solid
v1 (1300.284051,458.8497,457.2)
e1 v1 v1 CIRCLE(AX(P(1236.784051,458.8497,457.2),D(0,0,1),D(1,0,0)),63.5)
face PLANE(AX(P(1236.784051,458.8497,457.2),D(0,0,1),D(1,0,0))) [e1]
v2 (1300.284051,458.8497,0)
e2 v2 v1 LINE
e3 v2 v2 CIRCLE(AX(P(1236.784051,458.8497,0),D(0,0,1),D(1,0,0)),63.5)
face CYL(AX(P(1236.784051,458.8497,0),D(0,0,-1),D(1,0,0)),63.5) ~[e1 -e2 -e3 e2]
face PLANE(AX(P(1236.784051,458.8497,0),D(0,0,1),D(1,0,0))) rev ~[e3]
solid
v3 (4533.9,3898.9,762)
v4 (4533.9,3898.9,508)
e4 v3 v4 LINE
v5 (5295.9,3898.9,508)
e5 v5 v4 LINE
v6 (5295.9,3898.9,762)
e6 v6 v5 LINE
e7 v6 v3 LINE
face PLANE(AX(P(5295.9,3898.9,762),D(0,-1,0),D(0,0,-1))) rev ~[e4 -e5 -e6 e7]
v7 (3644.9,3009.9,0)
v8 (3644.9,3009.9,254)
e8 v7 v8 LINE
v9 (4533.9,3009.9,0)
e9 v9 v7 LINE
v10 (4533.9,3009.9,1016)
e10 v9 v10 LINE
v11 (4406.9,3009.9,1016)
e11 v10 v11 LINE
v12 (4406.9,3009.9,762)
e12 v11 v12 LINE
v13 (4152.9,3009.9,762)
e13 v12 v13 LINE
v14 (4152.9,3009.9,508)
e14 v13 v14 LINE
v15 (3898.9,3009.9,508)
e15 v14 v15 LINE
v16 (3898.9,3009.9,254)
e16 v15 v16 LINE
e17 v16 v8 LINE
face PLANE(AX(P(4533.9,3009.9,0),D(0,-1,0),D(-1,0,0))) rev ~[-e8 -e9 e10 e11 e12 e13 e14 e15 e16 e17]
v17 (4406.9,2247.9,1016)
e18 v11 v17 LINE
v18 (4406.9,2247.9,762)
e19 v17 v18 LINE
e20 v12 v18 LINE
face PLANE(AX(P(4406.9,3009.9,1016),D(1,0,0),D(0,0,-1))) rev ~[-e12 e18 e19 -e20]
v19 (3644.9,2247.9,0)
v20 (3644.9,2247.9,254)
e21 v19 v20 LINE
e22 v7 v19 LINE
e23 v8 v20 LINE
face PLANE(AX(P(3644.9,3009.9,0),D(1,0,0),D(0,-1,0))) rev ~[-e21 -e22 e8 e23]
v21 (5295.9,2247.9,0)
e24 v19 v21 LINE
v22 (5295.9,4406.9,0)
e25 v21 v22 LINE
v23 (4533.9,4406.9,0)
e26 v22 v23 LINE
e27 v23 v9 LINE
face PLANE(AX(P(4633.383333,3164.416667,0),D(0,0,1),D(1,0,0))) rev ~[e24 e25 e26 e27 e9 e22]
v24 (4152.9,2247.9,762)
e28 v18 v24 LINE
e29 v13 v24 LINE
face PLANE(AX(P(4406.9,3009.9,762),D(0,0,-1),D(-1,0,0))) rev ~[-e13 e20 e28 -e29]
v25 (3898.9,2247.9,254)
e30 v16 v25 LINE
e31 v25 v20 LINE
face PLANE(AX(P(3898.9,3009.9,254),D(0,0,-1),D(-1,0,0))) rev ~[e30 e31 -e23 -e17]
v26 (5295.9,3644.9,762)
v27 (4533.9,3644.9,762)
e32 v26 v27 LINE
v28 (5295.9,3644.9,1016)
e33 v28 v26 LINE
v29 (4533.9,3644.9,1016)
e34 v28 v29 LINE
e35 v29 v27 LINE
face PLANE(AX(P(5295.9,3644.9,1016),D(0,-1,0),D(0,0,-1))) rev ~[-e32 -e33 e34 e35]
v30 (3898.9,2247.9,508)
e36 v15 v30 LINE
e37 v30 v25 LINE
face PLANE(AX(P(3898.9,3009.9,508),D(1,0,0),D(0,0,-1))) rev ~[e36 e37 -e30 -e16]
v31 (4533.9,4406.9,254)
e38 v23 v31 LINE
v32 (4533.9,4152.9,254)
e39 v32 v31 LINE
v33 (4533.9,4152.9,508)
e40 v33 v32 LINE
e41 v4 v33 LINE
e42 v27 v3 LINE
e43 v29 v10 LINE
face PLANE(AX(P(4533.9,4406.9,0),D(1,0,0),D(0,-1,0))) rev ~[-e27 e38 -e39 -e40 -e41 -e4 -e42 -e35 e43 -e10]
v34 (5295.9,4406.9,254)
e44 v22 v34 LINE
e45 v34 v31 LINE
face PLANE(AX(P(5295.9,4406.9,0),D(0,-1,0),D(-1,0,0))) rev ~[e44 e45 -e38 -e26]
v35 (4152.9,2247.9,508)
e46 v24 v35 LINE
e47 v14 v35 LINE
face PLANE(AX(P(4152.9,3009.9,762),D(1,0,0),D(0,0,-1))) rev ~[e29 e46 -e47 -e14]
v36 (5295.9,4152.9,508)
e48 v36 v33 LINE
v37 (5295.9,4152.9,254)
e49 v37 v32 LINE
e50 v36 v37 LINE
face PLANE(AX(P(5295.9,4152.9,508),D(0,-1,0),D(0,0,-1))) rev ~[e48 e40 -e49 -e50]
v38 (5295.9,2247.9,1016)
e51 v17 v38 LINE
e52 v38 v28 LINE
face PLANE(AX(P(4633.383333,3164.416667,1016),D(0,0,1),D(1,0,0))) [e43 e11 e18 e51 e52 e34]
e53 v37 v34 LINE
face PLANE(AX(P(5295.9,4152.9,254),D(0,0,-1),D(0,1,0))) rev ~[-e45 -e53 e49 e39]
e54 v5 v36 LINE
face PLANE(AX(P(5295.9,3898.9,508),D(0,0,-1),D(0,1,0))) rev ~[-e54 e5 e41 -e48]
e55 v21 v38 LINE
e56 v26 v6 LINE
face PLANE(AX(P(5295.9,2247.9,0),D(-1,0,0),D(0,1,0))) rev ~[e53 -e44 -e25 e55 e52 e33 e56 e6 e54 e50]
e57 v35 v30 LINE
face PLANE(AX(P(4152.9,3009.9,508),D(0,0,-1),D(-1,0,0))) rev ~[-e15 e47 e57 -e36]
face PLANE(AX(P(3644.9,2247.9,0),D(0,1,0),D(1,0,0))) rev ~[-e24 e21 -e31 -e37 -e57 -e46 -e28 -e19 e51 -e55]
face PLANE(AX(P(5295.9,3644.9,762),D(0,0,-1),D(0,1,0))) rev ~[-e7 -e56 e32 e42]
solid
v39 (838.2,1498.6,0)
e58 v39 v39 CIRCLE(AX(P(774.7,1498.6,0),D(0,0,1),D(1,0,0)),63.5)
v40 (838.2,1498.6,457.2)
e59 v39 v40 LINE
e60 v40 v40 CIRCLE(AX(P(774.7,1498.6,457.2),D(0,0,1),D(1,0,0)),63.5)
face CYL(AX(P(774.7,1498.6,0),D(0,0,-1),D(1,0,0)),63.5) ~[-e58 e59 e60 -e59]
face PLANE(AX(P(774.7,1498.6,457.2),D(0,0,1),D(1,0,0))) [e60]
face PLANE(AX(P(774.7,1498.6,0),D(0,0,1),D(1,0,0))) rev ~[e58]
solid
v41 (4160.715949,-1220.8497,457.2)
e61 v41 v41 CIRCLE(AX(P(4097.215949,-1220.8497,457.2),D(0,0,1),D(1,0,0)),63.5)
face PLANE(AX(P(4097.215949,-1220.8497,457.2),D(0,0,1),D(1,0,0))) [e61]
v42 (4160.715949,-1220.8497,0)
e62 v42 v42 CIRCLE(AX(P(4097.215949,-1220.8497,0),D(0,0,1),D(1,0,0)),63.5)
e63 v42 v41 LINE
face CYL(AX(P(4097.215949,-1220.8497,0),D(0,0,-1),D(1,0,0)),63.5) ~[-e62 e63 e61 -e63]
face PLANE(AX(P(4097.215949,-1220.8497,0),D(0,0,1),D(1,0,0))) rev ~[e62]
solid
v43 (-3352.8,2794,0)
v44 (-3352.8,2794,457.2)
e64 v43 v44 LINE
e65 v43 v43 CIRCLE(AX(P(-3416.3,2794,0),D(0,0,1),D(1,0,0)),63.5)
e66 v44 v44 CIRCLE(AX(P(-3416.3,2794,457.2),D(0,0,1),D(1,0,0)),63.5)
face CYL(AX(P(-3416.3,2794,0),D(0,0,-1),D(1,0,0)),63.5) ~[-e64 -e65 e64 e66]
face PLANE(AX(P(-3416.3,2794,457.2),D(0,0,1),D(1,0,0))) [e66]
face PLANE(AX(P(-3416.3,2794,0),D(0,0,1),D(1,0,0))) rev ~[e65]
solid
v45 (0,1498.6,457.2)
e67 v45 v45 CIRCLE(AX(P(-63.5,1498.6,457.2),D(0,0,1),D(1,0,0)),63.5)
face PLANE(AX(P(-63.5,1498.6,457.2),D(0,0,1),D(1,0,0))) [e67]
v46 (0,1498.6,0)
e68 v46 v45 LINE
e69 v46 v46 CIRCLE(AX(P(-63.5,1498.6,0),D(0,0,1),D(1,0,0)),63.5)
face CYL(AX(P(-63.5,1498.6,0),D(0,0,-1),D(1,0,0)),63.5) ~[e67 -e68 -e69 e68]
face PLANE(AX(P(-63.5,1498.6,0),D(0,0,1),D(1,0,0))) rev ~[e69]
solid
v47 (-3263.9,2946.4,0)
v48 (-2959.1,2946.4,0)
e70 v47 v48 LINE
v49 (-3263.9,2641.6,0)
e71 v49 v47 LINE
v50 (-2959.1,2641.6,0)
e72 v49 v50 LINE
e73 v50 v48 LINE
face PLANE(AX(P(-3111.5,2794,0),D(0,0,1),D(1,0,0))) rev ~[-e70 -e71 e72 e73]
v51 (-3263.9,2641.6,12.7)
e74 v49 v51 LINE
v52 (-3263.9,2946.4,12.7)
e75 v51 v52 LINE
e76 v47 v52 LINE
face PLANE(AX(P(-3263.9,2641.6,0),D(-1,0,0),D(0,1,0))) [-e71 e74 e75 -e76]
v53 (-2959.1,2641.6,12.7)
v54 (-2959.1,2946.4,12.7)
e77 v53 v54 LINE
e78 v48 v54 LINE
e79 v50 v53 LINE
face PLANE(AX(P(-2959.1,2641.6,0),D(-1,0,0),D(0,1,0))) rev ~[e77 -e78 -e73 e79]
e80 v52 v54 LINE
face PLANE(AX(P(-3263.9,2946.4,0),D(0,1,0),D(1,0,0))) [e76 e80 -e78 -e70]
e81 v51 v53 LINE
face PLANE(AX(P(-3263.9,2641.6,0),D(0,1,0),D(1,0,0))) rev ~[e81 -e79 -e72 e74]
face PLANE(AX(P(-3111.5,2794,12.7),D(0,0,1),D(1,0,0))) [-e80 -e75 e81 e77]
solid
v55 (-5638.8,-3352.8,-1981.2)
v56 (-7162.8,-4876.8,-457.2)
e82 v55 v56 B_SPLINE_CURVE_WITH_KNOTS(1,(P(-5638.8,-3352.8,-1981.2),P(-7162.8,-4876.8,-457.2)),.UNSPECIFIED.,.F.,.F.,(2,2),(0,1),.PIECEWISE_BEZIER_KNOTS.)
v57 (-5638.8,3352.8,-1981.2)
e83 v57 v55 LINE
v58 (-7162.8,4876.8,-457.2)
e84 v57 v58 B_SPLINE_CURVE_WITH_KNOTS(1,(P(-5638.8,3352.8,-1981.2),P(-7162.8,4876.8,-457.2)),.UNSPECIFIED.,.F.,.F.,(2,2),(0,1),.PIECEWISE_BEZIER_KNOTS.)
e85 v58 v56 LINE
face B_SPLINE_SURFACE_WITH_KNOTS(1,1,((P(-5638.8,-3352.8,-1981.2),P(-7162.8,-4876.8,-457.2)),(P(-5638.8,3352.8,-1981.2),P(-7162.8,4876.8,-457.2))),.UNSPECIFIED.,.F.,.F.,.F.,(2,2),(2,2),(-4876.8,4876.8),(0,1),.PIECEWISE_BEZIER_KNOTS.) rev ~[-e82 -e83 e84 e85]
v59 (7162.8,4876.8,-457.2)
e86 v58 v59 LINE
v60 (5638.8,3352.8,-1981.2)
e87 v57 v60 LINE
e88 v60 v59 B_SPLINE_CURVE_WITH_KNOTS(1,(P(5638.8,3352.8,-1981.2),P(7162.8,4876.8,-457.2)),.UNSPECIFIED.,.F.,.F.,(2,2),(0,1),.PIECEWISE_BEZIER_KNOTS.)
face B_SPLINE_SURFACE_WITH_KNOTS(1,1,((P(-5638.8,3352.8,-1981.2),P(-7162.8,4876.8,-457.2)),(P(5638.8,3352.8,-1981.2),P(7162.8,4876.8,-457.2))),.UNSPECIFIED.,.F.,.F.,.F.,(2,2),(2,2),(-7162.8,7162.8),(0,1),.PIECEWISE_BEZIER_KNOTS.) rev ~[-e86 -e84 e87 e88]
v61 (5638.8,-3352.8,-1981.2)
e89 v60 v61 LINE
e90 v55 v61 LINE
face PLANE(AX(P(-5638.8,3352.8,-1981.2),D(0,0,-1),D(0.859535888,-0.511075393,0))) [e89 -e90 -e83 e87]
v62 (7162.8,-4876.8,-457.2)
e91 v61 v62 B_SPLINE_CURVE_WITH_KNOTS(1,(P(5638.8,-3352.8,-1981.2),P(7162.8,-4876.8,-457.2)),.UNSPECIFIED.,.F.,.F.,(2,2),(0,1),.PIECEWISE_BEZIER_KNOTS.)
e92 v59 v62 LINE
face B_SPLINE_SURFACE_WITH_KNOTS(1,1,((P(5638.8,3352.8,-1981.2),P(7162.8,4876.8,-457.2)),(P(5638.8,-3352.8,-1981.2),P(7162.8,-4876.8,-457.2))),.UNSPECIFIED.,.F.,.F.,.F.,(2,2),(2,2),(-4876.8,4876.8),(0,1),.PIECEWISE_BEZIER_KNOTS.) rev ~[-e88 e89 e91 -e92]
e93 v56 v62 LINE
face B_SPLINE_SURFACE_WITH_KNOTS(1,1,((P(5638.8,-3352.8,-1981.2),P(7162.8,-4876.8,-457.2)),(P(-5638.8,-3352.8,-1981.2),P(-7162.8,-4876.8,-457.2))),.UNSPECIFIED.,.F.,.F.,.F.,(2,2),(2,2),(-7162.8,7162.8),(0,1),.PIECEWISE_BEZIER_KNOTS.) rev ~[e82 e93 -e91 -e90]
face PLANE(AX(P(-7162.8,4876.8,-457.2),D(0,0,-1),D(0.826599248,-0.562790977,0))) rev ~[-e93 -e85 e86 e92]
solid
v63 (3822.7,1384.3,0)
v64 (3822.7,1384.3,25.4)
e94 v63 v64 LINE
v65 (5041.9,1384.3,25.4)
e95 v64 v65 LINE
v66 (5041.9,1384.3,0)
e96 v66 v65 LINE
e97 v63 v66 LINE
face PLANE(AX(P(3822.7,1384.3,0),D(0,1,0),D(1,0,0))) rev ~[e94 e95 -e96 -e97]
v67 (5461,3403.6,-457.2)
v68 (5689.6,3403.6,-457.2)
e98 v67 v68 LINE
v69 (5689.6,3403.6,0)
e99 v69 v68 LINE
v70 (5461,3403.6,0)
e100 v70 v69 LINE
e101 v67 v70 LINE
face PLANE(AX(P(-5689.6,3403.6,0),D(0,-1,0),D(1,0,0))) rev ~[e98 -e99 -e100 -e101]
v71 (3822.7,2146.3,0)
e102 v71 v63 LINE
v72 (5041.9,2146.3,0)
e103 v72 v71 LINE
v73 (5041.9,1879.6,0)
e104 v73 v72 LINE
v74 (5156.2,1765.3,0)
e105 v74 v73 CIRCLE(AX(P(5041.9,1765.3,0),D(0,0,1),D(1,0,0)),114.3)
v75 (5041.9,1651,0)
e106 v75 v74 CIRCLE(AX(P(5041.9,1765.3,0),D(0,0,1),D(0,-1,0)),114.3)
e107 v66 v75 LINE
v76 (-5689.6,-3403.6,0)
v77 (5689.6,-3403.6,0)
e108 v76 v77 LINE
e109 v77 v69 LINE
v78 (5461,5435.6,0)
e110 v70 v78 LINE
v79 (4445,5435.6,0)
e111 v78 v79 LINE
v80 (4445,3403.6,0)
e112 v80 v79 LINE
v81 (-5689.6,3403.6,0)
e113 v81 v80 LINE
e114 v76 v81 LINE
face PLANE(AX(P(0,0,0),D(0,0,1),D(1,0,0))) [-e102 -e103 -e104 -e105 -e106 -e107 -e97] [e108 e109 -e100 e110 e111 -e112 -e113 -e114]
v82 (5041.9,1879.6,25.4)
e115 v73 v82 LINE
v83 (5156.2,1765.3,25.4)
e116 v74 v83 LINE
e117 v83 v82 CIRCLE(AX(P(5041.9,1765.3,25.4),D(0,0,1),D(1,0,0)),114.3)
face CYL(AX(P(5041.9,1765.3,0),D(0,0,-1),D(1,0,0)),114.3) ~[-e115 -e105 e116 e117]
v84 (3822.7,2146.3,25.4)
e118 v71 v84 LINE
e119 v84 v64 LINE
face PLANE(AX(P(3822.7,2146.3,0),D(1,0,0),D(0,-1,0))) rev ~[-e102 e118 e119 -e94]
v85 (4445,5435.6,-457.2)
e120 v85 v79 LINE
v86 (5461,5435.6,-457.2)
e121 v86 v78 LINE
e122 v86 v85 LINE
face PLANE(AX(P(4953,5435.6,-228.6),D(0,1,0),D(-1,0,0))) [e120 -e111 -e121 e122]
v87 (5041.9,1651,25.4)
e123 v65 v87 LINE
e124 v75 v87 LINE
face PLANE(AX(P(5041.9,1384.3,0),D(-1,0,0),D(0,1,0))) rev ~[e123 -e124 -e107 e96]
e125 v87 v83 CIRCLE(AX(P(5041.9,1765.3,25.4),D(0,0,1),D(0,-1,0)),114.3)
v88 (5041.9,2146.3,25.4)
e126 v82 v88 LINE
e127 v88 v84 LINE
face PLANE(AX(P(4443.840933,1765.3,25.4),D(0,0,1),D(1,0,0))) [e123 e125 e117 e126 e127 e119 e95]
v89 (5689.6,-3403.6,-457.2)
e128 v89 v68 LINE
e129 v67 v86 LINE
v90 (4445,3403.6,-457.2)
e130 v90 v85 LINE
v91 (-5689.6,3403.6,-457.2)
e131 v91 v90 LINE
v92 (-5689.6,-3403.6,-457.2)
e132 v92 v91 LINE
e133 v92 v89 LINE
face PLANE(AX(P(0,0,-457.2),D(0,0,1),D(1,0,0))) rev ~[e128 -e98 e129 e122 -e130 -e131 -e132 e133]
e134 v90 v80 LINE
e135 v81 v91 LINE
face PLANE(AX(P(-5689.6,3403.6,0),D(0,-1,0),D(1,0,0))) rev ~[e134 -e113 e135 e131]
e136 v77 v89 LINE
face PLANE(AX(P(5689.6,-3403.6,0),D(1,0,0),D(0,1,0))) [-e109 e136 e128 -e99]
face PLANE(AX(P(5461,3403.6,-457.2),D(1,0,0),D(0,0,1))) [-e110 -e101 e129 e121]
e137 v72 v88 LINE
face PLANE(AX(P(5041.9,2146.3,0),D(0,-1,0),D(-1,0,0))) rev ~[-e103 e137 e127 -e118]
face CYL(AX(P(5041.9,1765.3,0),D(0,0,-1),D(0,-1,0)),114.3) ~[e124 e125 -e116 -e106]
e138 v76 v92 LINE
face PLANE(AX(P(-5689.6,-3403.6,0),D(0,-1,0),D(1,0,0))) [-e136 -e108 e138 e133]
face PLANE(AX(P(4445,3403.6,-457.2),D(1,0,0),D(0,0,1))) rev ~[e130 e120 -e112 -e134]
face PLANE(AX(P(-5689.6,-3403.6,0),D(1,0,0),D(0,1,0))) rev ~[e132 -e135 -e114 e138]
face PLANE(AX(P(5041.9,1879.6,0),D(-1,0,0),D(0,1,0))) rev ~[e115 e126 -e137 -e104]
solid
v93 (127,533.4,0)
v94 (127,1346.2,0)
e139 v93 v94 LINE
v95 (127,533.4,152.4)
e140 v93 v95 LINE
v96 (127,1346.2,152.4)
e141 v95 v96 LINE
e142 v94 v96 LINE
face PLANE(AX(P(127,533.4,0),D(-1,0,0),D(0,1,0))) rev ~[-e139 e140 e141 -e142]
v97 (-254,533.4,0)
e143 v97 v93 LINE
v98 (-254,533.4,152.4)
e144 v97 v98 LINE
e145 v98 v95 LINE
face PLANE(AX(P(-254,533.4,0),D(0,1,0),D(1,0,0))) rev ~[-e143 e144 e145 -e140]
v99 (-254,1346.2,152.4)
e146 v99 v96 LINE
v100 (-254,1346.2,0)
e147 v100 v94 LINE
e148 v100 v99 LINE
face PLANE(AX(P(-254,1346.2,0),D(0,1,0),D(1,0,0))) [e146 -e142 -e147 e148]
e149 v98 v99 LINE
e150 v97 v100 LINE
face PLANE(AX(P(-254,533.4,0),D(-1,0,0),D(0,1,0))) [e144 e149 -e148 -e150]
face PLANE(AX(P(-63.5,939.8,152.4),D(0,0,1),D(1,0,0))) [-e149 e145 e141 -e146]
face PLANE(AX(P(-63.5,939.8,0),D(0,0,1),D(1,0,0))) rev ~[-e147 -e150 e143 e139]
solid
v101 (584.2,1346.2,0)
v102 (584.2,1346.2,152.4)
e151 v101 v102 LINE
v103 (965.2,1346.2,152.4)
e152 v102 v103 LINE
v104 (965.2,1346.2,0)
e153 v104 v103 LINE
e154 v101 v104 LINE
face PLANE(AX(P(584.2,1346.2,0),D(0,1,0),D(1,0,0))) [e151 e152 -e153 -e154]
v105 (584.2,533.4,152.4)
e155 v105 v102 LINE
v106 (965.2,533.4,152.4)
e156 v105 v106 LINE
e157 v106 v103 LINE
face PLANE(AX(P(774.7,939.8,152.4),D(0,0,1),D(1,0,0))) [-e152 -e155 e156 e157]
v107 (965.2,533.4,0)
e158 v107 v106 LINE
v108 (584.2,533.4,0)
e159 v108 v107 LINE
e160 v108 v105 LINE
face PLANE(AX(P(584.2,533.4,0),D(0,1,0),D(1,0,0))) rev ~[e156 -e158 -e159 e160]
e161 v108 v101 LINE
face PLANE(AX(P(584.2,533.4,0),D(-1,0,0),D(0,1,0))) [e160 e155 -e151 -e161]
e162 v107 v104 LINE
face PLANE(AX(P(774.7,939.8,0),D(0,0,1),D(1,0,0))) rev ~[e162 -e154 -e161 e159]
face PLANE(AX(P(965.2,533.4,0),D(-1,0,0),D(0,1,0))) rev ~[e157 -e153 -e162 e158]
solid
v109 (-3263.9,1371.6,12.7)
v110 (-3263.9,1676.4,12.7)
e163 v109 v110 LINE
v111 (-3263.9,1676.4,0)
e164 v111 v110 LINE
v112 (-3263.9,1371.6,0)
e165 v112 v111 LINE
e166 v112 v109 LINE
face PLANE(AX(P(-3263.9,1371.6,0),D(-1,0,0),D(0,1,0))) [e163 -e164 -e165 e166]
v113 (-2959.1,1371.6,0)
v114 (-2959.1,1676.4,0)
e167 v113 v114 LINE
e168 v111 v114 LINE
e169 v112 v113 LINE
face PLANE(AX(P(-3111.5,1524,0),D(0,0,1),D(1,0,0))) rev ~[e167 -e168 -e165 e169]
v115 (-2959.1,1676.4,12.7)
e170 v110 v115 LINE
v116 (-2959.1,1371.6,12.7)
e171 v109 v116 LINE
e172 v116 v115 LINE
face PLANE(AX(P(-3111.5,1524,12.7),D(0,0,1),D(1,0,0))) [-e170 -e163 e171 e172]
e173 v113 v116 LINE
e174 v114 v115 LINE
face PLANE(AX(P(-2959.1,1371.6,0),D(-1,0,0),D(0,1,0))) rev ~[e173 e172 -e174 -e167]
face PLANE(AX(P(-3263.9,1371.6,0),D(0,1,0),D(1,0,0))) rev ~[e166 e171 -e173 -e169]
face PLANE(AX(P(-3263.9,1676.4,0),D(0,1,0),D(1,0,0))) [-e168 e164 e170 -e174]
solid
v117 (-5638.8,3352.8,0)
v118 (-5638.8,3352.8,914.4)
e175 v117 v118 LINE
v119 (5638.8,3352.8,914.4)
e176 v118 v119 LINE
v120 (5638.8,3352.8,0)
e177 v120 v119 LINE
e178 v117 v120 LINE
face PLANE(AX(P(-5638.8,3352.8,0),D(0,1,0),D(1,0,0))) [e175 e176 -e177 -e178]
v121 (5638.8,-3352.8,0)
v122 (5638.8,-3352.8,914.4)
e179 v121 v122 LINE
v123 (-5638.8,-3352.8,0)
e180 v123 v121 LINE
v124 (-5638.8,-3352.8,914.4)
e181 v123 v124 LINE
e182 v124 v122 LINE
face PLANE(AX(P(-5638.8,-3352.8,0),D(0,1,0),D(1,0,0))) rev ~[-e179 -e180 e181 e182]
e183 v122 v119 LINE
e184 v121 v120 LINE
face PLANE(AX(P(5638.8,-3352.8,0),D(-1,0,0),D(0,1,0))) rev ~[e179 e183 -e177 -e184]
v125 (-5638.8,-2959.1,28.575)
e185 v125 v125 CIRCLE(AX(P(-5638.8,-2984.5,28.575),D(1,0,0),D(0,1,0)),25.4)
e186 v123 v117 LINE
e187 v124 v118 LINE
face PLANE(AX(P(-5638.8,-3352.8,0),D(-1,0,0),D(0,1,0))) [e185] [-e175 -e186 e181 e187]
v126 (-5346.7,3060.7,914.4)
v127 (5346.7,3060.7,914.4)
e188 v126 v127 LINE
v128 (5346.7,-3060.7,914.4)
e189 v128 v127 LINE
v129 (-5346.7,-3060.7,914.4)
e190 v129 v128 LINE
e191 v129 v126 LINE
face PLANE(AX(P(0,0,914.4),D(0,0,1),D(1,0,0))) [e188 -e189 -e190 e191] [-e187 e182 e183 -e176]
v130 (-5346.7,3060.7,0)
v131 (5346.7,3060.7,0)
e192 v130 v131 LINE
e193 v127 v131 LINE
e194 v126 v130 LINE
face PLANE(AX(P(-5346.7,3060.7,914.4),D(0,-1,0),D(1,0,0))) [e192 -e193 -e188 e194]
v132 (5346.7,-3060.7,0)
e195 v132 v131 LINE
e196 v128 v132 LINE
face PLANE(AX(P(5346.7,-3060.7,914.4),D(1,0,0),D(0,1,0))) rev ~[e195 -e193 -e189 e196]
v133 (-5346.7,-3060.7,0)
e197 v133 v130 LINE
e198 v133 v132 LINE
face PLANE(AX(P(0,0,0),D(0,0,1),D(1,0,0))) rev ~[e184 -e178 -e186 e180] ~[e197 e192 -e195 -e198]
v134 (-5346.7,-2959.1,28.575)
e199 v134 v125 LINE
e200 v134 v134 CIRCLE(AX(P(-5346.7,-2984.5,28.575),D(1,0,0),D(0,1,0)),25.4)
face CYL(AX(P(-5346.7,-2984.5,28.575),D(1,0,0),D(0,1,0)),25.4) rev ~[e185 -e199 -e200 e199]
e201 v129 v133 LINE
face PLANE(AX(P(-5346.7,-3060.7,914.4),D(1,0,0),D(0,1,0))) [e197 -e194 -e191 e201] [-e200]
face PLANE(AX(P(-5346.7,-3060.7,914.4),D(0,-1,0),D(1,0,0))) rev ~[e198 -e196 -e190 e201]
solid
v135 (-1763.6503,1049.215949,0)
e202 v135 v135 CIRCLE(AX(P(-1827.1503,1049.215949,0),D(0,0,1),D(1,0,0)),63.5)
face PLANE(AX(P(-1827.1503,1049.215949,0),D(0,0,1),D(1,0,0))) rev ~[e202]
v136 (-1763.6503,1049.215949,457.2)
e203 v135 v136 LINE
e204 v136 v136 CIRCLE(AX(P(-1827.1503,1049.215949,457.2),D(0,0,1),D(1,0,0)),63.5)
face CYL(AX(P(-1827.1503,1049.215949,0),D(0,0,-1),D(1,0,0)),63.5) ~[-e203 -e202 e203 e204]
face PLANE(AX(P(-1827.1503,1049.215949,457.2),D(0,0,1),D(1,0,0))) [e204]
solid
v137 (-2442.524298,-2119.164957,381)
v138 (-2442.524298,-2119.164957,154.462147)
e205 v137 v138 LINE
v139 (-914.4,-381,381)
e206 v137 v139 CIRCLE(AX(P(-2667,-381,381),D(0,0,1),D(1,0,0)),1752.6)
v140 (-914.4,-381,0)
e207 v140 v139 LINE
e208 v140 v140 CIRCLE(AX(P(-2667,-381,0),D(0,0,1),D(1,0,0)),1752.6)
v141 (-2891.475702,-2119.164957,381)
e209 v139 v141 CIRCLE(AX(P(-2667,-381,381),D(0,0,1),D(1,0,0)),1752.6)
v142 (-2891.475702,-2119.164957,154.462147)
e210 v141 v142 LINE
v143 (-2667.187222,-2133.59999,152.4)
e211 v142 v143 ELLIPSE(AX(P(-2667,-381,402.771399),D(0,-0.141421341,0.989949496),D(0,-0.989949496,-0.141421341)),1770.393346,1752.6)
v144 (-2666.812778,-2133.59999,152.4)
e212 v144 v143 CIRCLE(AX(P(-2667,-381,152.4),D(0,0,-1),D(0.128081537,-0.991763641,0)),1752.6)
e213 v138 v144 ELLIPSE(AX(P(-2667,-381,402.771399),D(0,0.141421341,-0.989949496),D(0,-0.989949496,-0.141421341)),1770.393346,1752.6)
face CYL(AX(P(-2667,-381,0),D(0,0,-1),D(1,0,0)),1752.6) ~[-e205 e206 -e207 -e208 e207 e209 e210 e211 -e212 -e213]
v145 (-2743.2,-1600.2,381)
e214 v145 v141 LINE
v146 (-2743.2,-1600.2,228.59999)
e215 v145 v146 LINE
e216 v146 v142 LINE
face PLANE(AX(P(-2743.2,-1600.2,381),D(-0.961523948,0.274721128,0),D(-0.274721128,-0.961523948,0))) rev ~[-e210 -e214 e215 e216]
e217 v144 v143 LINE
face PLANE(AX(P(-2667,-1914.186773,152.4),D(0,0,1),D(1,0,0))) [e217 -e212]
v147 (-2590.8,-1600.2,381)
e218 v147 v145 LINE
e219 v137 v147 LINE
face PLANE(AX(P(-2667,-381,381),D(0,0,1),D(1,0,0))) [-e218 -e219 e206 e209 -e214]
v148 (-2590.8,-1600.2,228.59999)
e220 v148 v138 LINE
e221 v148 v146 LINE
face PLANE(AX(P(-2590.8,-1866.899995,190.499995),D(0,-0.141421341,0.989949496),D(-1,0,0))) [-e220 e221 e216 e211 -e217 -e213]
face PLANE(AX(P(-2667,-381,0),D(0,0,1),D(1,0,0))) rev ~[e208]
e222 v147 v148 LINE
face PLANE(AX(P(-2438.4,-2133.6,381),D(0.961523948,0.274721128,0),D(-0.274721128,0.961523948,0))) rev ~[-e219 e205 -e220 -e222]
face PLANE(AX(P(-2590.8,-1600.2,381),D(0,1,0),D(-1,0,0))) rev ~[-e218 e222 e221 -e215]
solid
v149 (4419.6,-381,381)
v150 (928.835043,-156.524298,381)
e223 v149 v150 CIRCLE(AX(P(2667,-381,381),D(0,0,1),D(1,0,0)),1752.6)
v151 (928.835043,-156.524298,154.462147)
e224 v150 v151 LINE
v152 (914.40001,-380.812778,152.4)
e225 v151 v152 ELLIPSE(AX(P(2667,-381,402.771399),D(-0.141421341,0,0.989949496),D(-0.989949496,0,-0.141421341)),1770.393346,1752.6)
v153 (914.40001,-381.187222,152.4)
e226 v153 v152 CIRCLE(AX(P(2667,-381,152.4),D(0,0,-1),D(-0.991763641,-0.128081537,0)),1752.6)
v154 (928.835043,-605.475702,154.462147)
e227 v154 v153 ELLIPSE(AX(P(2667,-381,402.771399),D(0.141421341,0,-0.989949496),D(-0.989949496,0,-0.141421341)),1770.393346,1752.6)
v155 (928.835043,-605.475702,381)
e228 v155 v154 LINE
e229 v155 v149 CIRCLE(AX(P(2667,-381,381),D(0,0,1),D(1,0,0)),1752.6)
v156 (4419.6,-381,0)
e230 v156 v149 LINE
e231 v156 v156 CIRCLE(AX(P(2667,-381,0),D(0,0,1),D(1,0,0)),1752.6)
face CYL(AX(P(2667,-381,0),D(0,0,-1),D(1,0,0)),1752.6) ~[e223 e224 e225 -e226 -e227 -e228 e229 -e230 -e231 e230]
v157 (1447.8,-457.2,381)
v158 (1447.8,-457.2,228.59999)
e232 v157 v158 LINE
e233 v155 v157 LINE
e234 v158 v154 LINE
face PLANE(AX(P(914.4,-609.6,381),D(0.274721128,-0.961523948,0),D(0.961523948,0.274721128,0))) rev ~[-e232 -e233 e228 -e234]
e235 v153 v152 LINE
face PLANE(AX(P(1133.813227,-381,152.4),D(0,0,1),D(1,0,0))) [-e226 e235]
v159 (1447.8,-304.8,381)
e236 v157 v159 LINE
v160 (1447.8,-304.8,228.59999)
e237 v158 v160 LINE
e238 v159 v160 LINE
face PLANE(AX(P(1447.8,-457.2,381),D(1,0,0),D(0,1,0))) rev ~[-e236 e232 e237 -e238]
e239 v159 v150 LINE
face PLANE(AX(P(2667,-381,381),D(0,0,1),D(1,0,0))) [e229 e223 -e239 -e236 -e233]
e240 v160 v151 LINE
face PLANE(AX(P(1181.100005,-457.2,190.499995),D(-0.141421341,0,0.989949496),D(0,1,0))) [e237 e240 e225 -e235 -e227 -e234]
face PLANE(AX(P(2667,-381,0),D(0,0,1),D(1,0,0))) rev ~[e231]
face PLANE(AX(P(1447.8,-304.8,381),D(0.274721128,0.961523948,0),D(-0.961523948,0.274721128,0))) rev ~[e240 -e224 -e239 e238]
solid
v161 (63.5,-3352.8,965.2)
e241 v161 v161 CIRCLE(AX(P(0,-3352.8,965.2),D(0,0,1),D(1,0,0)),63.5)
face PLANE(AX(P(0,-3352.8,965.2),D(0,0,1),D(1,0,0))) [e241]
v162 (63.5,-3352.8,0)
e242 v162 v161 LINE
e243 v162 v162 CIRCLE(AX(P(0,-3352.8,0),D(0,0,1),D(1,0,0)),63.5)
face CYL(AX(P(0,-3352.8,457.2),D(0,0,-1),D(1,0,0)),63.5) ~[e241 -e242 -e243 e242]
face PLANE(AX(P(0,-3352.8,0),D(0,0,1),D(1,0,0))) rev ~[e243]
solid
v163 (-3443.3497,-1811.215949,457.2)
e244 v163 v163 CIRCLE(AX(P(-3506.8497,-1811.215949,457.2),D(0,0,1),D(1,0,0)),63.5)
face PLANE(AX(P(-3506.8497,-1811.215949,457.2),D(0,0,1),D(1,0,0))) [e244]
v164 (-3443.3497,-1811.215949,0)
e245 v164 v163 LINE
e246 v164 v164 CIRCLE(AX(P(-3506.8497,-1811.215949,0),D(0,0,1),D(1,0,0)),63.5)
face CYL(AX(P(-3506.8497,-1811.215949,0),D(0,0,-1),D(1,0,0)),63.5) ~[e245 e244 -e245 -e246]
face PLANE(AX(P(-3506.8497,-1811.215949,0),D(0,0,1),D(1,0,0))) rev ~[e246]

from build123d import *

# Parameters (mm, degrees)
F0_W        = 11277.6
F0_H        = 6705.6
F1_DEPTH    = 457.2
F2_W        = 11277.6
F2_H        = 6705.6
F2_W_2      = 10668
F2_H_2      = 6096
F3_DEPTH    = 914.4
F4_R        = 1752.6
F5_DEPTH    = 381
F6_W        = 304.8
F6_H        = 304.8
F7_DEPTH    = 12.7
F8_W        = 381
F8_H        = 812.8
F9_DEPTH    = 152.4
F11_W       = 11277.6
F11_H       = 6705.6
F12_DEPTH   = 1524
F12_TAPER   = -45
F14_R       = 63.5
F15_DEPTH   = 457.2
F16_DEPTH   = 508
F17_W       = 10693.4
F17_H       = 6121.4
F17_W_2     = 10668
F17_H_2     = 6096
F18_DEPTH   = 914.4
F21_DEPTH   = 228.6
F22_SIZE2   = 533.39999
F22_SIZE    = 76.19999
F22_2_SIZE2 = 533.39999
F22_2_SIZE  = 76.19999
F23_W       = 11379.2
F23_H       = 6807.2
F23_W_2     = 11277.6
F23_H_2     = 6705.6
F24_DEPTH   = 457.2
F25_W       = 1016
F25_H       = 457.2
F26_DEPTH   = 2032
F27_R       = 25.4
F28_DEPTH   = 1816.1010001
F30_DEPTH   = 1016
F32_DEPTH   = 762
F34_DEPTH   = 762
F36_DEPTH   = 25.4


# Not quite as in the source:
# - a fillet or chamfer is up to 0.001 mm smaller than in the source, because OpenCascade refuses the exact size


with BuildPart() as f1:
    # F0 (on Top) → F1 (new body)
    with BuildSketch(Plane.XY):
        Rectangle(F0_W, F0_H)
    extrude(amount=-F1_DEPTH)

    # F23 (on Top) → F24 (join, through all)
    with BuildSketch(Plane.XY):
        Rectangle(F23_W, F23_H)
        Rectangle(F23_W_2, F23_H_2, mode=Mode.SUBTRACT)
    extrude(amount=-F24_DEPTH)

    # F25 (on face) → F26 (join)
    with BuildSketch(Plane(origin=(0, 3403.6, 0), x_dir=(-1, 0, 0), z_dir=(0, 1, 0))):
        with Locations((-4953, -228.6)):
            Rectangle(F25_W, F25_H)
    extrude(amount=F26_DEPTH)

    # F35 (on face) → F36 (join)
    with BuildSketch(Plane.XY):
        with BuildLine():
            Line((5041.9, 2146.3), (3822.7, 2146.3))
            Line((3822.7, 2146.3), (3822.7, 1384.3))
            Line((3822.7, 1384.3), (5041.9, 1384.3))
            Line((5041.9, 1384.3), (5041.9, 1651))
            ThreePointArc((5041.9, 1651), (4927.6, 1765.3), (5041.9, 1879.6))
            Line((5041.9, 1879.6), (5041.9, 2146.3))
        make_face()
        with BuildLine():
            ThreePointArc((5156.2, 1765.3), (5122.7223050896, 1846.1223050896), (5041.9, 1879.6))
            Line((5041.9, 1879.6), (5041.9, 1651))
            ThreePointArc((5041.9, 1651), (5122.7223050896, 1684.4776949104), (5156.2, 1765.3))
        make_face()
        with BuildLine():
            Line((5041.9, 1651), (5041.9, 1879.6))
            ThreePointArc((5041.9, 1879.6), (4927.6, 1765.3), (5041.9, 1651))
        make_face()
    extrude(amount=F36_DEPTH)


with BuildPart() as f3:
    # F2 (on face) → F3 (new body)
    with BuildSketch(Plane.XY):
        Rectangle(F2_W, F2_H)
        Rectangle(F2_W_2, F2_H_2, mode=Mode.SUBTRACT)
    extrude(amount=F3_DEPTH)

    # F17 (on face) → F18 (cut, through all)
    with BuildSketch(Plane.XY.offset(914.4)):
        Rectangle(F17_W, F17_H)
        Rectangle(F17_W_2, F17_H_2, mode=Mode.SUBTRACT)
    extrude(amount=-F18_DEPTH, mode=Mode.SUBTRACT)

    # F27 (on face) → F28 (cut, through all)
    with BuildSketch(Plane.YZ.offset(-5346.7)):
        with Locations((-2984.5, 28.575)):
            Circle(F27_R)
    extrude(amount=-F28_DEPTH, mode=Mode.SUBTRACT)


with BuildPart() as f5:
    # F4 (on face) → F5 (new body)
    with BuildSketch(Plane.XY):
        with Locations((-2667, -381)):
            Circle(F4_R)
    extrude(amount=F5_DEPTH)


with BuildPart() as f5b:
    # F4 (on face) → F5, piece 2 (new body)
    with BuildSketch(Plane.XY):
        with Locations((2667, -381)):
            Circle(F4_R)
    extrude(amount=F5_DEPTH)


with BuildPart() as f7:
    # F6 (on face) → F7 (new body)
    with BuildSketch(Plane.XY):
        with Locations((-3111.5, 2794)):
            Rectangle(F6_W, F6_H)
    extrude(amount=F7_DEPTH)


with BuildPart() as f7b:
    # F6 (on face) → F7, piece 2 (new body)
    with BuildSketch(Plane.XY):
        with Locations((-3111.5, 1524)):
            Rectangle(F6_W, F6_H)
    extrude(amount=F7_DEPTH)


with BuildPart() as f9:
    # F8 (on face) → F9 (new body)
    with BuildSketch(Plane.XY):
        with Locations((-63.5, 939.8)):
            Rectangle(F8_W, F8_H)
    extrude(amount=F9_DEPTH)


with BuildPart() as f9b:
    # F8 (on face) → F9, piece 2 (new body)
    with BuildSketch(Plane.XY):
        with Locations((774.7, 939.8)):
            Rectangle(F8_W, F8_H)
    extrude(amount=F9_DEPTH)


with BuildPart() as f12:
    # F11 (on offset) → F12 (new body)
    with BuildSketch(Plane(origin=(0, 0, -1981.2), x_dir=(1, 0, 0), z_dir=(0, 0, -1))):
        Rectangle(F11_W, F11_H)
    extrude(amount=-F12_DEPTH, taper=F12_TAPER)


with BuildPart() as f15:
    # F14 (on face) → F15 (new body)
    with BuildSketch(Plane.XY):
        with Locations((-63.5, 1498.6)):
            Circle(F14_R)
    extrude(amount=F15_DEPTH)


with BuildPart() as f15b:
    # F14 (on face) → F15, piece 2 (new body)
    with BuildSketch(Plane.XY):
        with Locations((774.7, 1498.6)):
            Circle(F14_R)
    extrude(amount=F15_DEPTH)


with BuildPart() as f15c:
    # F14 (on face) → F15, piece 3 (new body)
    with BuildSketch(Plane.XY):
        with Locations((4097.2159486254, -1220.8497000298)):
            Circle(F14_R)
    extrude(amount=F15_DEPTH)


with BuildPart() as f15d:
    # F14 (on face) → F15, piece 4 (new body)
    with BuildSketch(Plane.XY):
        with Locations((-3416.3, 2794)):
            Circle(F14_R)
    extrude(amount=F15_DEPTH)


with BuildPart() as f15e:
    # F14 (on face) → F15, piece 5 (new body)
    with BuildSketch(Plane.XY):
        with Locations((0, -3352.8)):
            Circle(F14_R)
    extrude(amount=F15_DEPTH)

    # F16 (add): a face of the model
    f16_faces = [f15e.faces().sort_by_distance(p)[0] for p in [
        (0, -3352.8, 457.2),
    ]]
    extrude(f16_faces, amount=F16_DEPTH)


with BuildPart() as f15f:
    # F14 (on face) → F15, piece 6 (new body)
    with BuildSketch(Plane.XY):
        with Locations((1236.7840513746, 458.8497000298)):
            Circle(F14_R)
    extrude(amount=F15_DEPTH)


with BuildPart() as f15g:
    # F14 (on face) → F15, piece 7 (new body)
    with BuildSketch(Plane.XY):
        with Locations((-3506.8497000298, -1811.2159486254)):
            Circle(F14_R)
    extrude(amount=F15_DEPTH)


with BuildPart() as f15h:
    # F14 (on face) → F15, piece 8 (new body)
    with BuildSketch(Plane.XY):
        with Locations((-1827.1502999702, 1049.2159486254)):
            Circle(F14_R)
    extrude(amount=F15_DEPTH)


with BuildPart() as f21_tool:
    # F20 (on face) → F21 (new body)
    with BuildSketch(Plane.XY.offset(381)):
        Polygon((-2743.2, -1600.2), (-2895.6, -2133.6), (-2438.4, -2133.6), (-2590.8, -1600.2), align=None)
        Polygon((1447.8, -304.8), (914.4, -152.4), (914.4, -609.6), (1447.8, -457.2), align=None)
    extrude(amount=-F21_DEPTH)


with BuildPart() as f5_1:
    add(f5.part)

    # F21: cut by f21_tool
    add(f21_tool.part, mode=Mode.SUBTRACT)

    # F22 (size 76.2 and 533.4 in the source; OpenCascade refuses exactly that, so slightly less here)
    f22_edges = [f5_1.edges().sort_by_distance(p)[0] for p in [
        (-2667, -1600.2, 152.4),
    ]]
    chamfer(f22_edges, length=F22_SIZE, length2=F22_SIZE2)


with BuildPart() as f5b_1:
    add(f5b.part)

    # F21: cut by f21_tool
    add(f21_tool.part, mode=Mode.SUBTRACT)

    # F22#2 (size 76.2 and 533.4 in the source; OpenCascade refuses exactly that, so slightly less here)
    f22_2_edges = [f5b_1.edges().sort_by_distance(p)[0] for p in [
        (1447.8, -381, 152.4),
    ]]
    chamfer(f22_2_edges, length=F22_2_SIZE, length2=F22_2_SIZE2)


with BuildPart() as f30:
    # F29 (on face) → F30 (new body)
    with BuildSketch(Plane.XY):
        Polygon((3644.9, 3009.9), (3644.9, 2247.9), (5295.9, 2247.9), (5295.9, 4406.9), (4533.9, 4406.9), (4533.9, 3009.9), align=None)
    extrude(amount=F30_DEPTH)

    # F31 (on face) → F32 (cut)
    with BuildSketch(Plane.YZ.offset(5295.9)):
        Polygon((4152.9, 254), (4406.9, 254), (4406.9, 1016), (3644.9, 1016), (3644.9, 762), (3898.9, 762), (3898.9, 508), (4152.9, 508), align=None)
    extrude(amount=-F32_DEPTH, mode=Mode.SUBTRACT)

    # F33 (on face) → F34 (cut)
    with BuildSketch(Plane(origin=(0, 3009.9, 0), x_dir=(-1, 0, 0), z_dir=(0, 1, 0))):
        Polygon((-3898.9, 254), (-3644.9, 254), (-3644.9, 1016), (-4406.9, 1016), (-4406.9, 762), (-4152.9, 762), (-4152.9, 508), (-3898.9, 508), align=None)
    extrude(amount=-F34_DEPTH, mode=Mode.SUBTRACT)


solid = Compound([f1.part, f3.part, f7.part, f7b.part, f9.part, f9b.part, f12.part, f15.part, f15b.part, f15c.part, f15d.part, f15e.part, f15f.part, f15g.part, f15h.part, f5_1.part, f5b_1.part, f30.part])
